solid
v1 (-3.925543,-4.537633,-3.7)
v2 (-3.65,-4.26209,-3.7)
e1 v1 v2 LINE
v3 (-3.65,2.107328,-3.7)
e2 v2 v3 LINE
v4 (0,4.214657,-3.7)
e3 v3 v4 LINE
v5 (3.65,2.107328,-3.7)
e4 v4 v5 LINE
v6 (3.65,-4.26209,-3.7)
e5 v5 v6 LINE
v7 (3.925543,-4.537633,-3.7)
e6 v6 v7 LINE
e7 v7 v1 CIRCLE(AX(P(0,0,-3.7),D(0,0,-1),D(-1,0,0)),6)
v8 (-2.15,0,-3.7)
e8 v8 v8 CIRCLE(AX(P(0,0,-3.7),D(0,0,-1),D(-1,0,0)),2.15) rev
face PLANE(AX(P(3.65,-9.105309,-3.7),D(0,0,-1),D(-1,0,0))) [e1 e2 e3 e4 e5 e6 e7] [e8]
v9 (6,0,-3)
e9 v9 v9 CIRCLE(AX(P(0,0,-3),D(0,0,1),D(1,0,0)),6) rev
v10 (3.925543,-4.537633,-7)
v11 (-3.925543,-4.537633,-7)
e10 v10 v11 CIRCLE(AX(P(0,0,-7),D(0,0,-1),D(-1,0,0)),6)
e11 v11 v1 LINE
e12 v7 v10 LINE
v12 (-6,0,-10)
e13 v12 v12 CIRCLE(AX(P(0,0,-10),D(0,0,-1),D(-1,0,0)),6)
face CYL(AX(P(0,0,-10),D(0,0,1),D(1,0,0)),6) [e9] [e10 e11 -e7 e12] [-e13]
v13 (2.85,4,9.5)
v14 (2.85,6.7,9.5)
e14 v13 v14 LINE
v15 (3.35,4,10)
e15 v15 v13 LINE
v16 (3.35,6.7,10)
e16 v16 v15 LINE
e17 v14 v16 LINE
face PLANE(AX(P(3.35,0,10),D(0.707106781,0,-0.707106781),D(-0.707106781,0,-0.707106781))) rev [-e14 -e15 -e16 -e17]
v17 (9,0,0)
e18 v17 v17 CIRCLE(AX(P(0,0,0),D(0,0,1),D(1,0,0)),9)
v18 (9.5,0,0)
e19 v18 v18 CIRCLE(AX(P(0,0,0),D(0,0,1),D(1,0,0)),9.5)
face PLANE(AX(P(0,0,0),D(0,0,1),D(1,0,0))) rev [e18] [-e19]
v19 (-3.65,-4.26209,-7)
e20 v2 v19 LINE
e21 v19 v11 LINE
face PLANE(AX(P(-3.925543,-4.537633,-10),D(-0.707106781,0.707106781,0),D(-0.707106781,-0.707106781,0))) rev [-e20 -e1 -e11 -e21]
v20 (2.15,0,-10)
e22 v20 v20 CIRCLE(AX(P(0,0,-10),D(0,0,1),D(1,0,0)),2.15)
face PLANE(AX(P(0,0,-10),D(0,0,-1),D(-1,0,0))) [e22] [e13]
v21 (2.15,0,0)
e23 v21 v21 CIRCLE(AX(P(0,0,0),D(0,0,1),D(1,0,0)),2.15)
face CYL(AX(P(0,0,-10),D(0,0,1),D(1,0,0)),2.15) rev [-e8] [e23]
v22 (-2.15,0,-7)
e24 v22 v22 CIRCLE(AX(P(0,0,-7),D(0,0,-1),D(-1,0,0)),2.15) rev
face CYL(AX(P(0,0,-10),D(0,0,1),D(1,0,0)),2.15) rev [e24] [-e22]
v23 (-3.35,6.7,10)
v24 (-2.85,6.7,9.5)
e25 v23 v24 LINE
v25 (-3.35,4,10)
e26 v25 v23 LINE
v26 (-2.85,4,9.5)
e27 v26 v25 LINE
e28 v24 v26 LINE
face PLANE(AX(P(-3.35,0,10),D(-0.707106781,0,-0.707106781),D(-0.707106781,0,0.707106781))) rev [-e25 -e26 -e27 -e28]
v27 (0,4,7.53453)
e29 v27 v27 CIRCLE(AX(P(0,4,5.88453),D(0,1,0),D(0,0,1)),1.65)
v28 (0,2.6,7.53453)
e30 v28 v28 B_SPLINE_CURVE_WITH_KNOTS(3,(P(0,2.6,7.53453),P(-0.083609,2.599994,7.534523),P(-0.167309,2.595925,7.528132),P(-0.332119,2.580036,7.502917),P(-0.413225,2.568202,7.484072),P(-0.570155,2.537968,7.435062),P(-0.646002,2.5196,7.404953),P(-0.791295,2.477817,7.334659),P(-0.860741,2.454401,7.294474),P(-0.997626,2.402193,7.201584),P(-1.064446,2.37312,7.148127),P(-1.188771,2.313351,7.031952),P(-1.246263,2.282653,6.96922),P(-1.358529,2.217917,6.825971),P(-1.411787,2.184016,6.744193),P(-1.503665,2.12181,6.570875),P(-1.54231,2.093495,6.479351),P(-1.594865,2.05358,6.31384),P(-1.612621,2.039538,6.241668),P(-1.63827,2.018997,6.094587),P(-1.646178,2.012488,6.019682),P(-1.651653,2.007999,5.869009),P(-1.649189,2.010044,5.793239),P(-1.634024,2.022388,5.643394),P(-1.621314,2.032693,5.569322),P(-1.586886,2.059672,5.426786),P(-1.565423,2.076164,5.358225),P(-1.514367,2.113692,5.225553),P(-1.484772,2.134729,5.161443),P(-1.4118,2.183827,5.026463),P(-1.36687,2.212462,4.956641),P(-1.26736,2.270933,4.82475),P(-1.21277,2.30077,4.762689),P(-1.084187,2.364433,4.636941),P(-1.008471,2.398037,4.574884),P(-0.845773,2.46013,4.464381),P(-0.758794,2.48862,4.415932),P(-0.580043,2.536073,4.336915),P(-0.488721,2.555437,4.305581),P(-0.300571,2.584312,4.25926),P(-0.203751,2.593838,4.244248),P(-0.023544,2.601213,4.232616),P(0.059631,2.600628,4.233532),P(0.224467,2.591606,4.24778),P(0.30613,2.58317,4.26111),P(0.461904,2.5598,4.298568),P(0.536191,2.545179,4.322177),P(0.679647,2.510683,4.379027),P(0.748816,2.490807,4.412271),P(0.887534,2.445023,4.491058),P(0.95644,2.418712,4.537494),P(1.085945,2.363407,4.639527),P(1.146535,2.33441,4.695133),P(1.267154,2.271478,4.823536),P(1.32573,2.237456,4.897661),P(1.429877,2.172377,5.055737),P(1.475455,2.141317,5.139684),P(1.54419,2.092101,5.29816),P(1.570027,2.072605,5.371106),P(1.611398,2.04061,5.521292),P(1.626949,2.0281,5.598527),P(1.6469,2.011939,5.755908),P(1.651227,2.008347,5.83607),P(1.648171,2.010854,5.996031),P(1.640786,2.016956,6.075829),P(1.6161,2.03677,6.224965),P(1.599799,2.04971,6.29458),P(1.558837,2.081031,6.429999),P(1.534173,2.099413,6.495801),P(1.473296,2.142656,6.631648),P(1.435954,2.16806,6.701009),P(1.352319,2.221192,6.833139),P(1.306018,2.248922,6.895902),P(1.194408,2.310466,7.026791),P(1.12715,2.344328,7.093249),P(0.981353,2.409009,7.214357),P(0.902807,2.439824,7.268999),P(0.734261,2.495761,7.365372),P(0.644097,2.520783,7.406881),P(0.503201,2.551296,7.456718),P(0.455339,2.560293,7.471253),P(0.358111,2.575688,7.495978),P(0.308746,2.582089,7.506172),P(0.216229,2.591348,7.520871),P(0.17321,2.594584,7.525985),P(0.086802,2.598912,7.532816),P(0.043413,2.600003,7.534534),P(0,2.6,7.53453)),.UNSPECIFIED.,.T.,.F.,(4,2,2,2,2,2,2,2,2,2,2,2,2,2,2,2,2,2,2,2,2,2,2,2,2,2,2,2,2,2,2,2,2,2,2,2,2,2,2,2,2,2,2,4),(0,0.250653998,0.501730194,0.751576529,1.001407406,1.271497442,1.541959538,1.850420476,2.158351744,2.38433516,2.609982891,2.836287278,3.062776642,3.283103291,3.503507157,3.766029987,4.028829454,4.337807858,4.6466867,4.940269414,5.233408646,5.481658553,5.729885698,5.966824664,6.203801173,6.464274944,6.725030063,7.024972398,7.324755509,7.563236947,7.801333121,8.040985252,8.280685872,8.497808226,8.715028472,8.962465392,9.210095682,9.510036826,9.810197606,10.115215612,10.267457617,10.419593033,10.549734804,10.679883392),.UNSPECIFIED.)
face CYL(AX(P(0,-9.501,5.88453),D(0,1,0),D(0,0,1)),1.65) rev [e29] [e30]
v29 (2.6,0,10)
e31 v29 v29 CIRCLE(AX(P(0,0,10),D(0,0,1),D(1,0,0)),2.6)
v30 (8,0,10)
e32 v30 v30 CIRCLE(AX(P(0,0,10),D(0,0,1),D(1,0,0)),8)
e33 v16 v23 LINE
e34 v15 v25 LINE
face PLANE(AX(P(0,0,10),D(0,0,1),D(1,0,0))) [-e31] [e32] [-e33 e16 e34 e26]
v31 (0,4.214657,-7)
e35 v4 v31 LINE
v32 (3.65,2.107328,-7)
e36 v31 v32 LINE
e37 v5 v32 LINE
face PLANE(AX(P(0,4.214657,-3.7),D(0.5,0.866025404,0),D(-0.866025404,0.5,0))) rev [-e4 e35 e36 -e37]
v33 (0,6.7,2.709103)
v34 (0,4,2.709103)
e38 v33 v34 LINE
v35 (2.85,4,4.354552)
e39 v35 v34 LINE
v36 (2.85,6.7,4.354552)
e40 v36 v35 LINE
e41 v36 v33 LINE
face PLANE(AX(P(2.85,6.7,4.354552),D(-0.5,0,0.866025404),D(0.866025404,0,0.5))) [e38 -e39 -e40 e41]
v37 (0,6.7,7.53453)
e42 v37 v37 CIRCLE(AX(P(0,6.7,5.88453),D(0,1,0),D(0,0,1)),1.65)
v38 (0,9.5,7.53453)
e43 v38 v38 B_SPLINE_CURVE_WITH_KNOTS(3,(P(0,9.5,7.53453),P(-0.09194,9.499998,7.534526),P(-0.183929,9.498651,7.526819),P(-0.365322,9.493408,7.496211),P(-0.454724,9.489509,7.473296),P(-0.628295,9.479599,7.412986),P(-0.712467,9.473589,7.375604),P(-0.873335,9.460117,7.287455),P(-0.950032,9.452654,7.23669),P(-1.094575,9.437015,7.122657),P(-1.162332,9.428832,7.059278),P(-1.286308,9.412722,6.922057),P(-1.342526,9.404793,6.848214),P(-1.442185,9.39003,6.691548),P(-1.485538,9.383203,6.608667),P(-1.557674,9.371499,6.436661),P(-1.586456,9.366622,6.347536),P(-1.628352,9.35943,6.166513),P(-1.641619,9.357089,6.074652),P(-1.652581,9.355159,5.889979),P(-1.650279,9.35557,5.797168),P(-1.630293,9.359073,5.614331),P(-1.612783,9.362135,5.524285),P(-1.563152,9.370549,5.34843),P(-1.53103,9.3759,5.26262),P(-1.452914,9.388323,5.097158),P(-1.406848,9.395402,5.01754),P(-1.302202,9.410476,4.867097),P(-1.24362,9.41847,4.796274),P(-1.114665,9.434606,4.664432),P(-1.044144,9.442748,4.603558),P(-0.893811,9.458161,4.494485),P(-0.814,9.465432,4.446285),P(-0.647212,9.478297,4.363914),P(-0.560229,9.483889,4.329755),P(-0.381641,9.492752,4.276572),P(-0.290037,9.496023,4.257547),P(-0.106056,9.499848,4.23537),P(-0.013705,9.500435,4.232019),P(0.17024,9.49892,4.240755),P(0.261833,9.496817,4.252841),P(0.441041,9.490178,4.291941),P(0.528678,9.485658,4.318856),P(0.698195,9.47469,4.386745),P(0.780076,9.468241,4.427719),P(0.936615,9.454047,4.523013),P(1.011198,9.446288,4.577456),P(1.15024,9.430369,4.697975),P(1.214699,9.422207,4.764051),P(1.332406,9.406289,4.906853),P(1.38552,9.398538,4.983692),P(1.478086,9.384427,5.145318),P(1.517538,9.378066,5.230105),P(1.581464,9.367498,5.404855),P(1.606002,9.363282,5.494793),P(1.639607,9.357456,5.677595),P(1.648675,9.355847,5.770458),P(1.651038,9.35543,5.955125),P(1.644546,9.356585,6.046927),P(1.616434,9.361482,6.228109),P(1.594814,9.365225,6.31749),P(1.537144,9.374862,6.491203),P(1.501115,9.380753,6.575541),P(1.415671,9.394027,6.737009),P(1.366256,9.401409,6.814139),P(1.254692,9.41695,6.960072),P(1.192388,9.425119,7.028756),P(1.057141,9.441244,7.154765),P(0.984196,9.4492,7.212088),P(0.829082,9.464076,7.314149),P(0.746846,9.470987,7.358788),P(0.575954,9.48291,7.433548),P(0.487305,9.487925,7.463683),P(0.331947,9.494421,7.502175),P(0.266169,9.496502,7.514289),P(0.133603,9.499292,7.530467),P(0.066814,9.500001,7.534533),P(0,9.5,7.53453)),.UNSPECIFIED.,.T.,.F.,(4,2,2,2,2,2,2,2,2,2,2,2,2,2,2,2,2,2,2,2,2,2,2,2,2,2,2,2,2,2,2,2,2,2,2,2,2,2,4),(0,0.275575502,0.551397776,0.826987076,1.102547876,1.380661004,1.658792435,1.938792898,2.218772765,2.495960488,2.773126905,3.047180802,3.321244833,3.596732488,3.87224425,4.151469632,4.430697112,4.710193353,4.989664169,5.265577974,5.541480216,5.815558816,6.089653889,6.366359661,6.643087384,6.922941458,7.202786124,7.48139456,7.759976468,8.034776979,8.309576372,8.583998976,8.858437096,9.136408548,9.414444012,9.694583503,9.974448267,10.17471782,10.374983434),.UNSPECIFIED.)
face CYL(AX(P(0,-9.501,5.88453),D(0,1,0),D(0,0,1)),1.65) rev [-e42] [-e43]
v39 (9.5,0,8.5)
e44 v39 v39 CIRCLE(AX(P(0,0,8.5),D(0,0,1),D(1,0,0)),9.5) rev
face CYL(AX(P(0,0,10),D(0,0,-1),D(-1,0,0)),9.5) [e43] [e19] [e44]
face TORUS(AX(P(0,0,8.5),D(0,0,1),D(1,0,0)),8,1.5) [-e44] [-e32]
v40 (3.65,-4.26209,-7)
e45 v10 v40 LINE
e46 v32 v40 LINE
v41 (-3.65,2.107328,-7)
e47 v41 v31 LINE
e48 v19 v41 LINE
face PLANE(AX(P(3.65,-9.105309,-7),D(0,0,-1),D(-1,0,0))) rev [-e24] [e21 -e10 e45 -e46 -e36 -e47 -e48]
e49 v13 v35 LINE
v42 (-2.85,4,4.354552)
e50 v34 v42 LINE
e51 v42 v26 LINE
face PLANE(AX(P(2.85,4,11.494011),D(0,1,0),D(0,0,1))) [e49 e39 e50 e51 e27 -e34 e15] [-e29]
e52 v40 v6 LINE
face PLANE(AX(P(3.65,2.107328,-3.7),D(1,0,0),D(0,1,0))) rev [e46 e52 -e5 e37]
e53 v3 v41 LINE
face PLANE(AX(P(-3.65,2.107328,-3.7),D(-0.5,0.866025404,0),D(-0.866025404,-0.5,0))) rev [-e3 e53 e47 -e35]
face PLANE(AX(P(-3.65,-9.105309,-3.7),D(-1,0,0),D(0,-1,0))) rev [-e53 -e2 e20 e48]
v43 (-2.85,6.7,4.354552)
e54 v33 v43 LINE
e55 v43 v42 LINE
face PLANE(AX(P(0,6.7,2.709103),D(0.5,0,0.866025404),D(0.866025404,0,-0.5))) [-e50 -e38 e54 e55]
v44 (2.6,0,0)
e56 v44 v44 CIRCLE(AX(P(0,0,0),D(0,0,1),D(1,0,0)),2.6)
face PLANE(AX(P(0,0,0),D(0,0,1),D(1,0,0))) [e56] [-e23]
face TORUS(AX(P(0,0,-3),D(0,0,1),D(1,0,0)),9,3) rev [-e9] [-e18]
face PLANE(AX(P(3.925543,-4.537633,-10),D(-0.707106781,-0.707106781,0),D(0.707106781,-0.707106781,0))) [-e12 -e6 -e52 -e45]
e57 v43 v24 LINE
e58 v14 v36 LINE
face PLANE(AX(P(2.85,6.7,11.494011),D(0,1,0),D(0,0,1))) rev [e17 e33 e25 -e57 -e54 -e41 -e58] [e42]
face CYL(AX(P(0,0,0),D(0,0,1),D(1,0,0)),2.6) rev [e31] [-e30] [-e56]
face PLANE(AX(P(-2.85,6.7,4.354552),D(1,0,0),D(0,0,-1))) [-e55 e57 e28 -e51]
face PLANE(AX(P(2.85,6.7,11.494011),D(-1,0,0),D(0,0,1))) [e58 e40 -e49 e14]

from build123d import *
from OCP.BRepFilletAPI import BRepFilletAPI_MakeChamfer

# Parameters (mm, degrees)
SKETCH1_R               = 9.5
BOSS_EXTRUDE1_DEPTH     = 10
SKETCH6_R               = 6
BOSS_EXTRUDE2_DEPTH     = 10
SKETCH2_R               = 2.6
CUT_EXTRUDE1_DEPTH      = 10
SKETCH3_R               = 2.15
CUT_EXTRUDE2_DEPTH      = 17.748134224
CUT_EXTRUDE3_DEPTH      = 3.3
CUT_EXTRUDE4_DEPTH      = 2.7
CUT_EXTRUDE5_REACH      = 25.479
CUT_EXTRUDE5_END_RADIUS = 2.6
SKETCH7_R               = 1.65
FILLET1_R               = 3
CHAMFER1_SIZE           = 0.356629571
CHAMFER1_SIZE_2         = 0.5
CHAMFER2_SIZE           = 0.5
FILLET2_R               = 1.5


with BuildPart() as part:
    # Sketch1 → Boss-Extrude1 (new body)
    with BuildSketch(Plane.XY):
        Circle(SKETCH1_R)
    extrude(amount=BOSS_EXTRUDE1_DEPTH)

    # Sketch6 → Boss-Extrude2 (add)
    with BuildSketch(Plane(origin=(0, 0, 0), x_dir=(-1, 0, 0), z_dir=(0, 0, -1))):
        with Locations(Location((0, 0, 0), (0, 0, 180))):
            Circle(SKETCH6_R)
    extrude(amount=BOSS_EXTRUDE2_DEPTH)

    # Sketch2 → Cut-Extrude1 (cut)
    with BuildSketch(Plane.XY.offset(10)):
        Circle(SKETCH2_R)
    extrude(amount=-CUT_EXTRUDE1_DEPTH, mode=Mode.SUBTRACT)

    # Sketch3 → Cut-Extrude2 (cut, through all)
    with BuildSketch(Plane.XY):
        Circle(SKETCH3_R)
    extrude(amount=-CUT_EXTRUDE2_DEPTH, mode=Mode.SUBTRACT)

    # Sketch4 → Cut-Extrude3 (cut)
    with BuildSketch(Plane(origin=(0, 0, -7), x_dir=(-1, 0, 0), z_dir=(0, 0, -1))):
        Polygon((-3.65, -9.105308986), (3.65, -9.105308986), (3.65, 2.107328483), (0, 4.214656965), (-3.65, 2.107328483), align=None)
    extrude(amount=-CUT_EXTRUDE3_DEPTH, mode=Mode.SUBTRACT)

    # Sketch5 → Cut-Extrude4 (cut)
    with BuildSketch(Plane(origin=(0, 4, 0), x_dir=(-1, 0, 0), z_dir=(0, 1, 0))):
        Polygon((-2.85, 11.49401058), (2.85, 11.49401058), (2.85, 4.354551733), (0, 2.709103466), (-2.85, 4.354551733), align=None)
    extrude(amount=CUT_EXTRUDE4_DEPTH, mode=Mode.SUBTRACT)

    # Cut-Extrude5: up to this cylinder (the profile starts outside it)
    cut_extrude5_end = Plane(origin=(0, 0, 5.88453), z_dir=(0, 0, 1)) * Cylinder(CUT_EXTRUDE5_END_RADIUS, 57.158, mode=Mode.PRIVATE)
    # Sketch7 → Cut-Extrude5 (cut, up to the surface)
    with BuildSketch(Plane(origin=(0, 9.5, 0), x_dir=(-1, 0, 0), z_dir=(0, 1, 0)), mode=Mode.PRIVATE) as cut_extrude5_sk1:
        with Locations(Location((0, 5.884529946, 0), (0, 0, 90))):
            Circle(SKETCH7_R)
    cut_extrude5_tool1 = extrude(cut_extrude5_sk1.sketch, amount=-CUT_EXTRUDE5_REACH, mode=Mode.PRIVATE) - cut_extrude5_end
    add(cut_extrude5_tool1.solids().sort_by_distance((0, 9.5, 5.88453))[0], mode=Mode.SUBTRACT)

    # Fillet1
    fillet1_edges = [part.edges().sort_by_distance(p)[0] for p in [
        (-6, 0, 0),
    ]]
    fillet(fillet1_edges, radius=FILLET1_R)

    # Chamfer1
    chamfer1_edges_1 = [part.edges().sort_by_distance(p)[0] for p in [
        (-3.65, -4.762089877, -5.35),
    ]]
    chamfer1_side_1 = [part.faces().sort_by_distance(p)[0] for p in [
        (-3.655661007, -4.757750884, -5.35),
    ]]
    chamfer1_edges_2 = [part.edges().sort_by_distance(p)[0] for p in [
        (3.65, -4.762089877, -5.35),
    ]]
    chamfer1_side_2 = [part.faces().sort_by_distance(p)[0] for p in [
        (3.655661007, -4.757750884, -5.35),
    ]]
    chamfer1 = BRepFilletAPI_MakeChamfer(part.part.solid().wrapped)
    for e in chamfer1_edges_1:
        chamfer1.Add(CHAMFER1_SIZE - 0.0004, CHAMFER1_SIZE_2 - 0.0004, e.wrapped, chamfer1_side_1[0].wrapped)
    for e in chamfer1_edges_2:
        chamfer1.Add(CHAMFER1_SIZE - 0.0004, CHAMFER1_SIZE_2 - 0.0004, e.wrapped, chamfer1_side_2[0].wrapped)
    add(Compound.cast(chamfer1.Shape()), mode=Mode.REPLACE)  # a hair under: the kernel refuses the full size

    # Chamfer2
    chamfer2_edges = [part.edges().sort_by_distance(p)[0] for p in [
        (-2.85, 5.35, 10),
        (2.85, 5.35, 10),
    ]]
    chamfer(chamfer2_edges, length=CHAMFER2_SIZE)

    # Fillet2
    fillet2_edges = [part.edges().sort_by_distance(p)[0] for p in [
        (-9.5, 0, 10),
    ]]
    fillet(fillet2_edges, radius=FILLET2_R)


solid = part.part
